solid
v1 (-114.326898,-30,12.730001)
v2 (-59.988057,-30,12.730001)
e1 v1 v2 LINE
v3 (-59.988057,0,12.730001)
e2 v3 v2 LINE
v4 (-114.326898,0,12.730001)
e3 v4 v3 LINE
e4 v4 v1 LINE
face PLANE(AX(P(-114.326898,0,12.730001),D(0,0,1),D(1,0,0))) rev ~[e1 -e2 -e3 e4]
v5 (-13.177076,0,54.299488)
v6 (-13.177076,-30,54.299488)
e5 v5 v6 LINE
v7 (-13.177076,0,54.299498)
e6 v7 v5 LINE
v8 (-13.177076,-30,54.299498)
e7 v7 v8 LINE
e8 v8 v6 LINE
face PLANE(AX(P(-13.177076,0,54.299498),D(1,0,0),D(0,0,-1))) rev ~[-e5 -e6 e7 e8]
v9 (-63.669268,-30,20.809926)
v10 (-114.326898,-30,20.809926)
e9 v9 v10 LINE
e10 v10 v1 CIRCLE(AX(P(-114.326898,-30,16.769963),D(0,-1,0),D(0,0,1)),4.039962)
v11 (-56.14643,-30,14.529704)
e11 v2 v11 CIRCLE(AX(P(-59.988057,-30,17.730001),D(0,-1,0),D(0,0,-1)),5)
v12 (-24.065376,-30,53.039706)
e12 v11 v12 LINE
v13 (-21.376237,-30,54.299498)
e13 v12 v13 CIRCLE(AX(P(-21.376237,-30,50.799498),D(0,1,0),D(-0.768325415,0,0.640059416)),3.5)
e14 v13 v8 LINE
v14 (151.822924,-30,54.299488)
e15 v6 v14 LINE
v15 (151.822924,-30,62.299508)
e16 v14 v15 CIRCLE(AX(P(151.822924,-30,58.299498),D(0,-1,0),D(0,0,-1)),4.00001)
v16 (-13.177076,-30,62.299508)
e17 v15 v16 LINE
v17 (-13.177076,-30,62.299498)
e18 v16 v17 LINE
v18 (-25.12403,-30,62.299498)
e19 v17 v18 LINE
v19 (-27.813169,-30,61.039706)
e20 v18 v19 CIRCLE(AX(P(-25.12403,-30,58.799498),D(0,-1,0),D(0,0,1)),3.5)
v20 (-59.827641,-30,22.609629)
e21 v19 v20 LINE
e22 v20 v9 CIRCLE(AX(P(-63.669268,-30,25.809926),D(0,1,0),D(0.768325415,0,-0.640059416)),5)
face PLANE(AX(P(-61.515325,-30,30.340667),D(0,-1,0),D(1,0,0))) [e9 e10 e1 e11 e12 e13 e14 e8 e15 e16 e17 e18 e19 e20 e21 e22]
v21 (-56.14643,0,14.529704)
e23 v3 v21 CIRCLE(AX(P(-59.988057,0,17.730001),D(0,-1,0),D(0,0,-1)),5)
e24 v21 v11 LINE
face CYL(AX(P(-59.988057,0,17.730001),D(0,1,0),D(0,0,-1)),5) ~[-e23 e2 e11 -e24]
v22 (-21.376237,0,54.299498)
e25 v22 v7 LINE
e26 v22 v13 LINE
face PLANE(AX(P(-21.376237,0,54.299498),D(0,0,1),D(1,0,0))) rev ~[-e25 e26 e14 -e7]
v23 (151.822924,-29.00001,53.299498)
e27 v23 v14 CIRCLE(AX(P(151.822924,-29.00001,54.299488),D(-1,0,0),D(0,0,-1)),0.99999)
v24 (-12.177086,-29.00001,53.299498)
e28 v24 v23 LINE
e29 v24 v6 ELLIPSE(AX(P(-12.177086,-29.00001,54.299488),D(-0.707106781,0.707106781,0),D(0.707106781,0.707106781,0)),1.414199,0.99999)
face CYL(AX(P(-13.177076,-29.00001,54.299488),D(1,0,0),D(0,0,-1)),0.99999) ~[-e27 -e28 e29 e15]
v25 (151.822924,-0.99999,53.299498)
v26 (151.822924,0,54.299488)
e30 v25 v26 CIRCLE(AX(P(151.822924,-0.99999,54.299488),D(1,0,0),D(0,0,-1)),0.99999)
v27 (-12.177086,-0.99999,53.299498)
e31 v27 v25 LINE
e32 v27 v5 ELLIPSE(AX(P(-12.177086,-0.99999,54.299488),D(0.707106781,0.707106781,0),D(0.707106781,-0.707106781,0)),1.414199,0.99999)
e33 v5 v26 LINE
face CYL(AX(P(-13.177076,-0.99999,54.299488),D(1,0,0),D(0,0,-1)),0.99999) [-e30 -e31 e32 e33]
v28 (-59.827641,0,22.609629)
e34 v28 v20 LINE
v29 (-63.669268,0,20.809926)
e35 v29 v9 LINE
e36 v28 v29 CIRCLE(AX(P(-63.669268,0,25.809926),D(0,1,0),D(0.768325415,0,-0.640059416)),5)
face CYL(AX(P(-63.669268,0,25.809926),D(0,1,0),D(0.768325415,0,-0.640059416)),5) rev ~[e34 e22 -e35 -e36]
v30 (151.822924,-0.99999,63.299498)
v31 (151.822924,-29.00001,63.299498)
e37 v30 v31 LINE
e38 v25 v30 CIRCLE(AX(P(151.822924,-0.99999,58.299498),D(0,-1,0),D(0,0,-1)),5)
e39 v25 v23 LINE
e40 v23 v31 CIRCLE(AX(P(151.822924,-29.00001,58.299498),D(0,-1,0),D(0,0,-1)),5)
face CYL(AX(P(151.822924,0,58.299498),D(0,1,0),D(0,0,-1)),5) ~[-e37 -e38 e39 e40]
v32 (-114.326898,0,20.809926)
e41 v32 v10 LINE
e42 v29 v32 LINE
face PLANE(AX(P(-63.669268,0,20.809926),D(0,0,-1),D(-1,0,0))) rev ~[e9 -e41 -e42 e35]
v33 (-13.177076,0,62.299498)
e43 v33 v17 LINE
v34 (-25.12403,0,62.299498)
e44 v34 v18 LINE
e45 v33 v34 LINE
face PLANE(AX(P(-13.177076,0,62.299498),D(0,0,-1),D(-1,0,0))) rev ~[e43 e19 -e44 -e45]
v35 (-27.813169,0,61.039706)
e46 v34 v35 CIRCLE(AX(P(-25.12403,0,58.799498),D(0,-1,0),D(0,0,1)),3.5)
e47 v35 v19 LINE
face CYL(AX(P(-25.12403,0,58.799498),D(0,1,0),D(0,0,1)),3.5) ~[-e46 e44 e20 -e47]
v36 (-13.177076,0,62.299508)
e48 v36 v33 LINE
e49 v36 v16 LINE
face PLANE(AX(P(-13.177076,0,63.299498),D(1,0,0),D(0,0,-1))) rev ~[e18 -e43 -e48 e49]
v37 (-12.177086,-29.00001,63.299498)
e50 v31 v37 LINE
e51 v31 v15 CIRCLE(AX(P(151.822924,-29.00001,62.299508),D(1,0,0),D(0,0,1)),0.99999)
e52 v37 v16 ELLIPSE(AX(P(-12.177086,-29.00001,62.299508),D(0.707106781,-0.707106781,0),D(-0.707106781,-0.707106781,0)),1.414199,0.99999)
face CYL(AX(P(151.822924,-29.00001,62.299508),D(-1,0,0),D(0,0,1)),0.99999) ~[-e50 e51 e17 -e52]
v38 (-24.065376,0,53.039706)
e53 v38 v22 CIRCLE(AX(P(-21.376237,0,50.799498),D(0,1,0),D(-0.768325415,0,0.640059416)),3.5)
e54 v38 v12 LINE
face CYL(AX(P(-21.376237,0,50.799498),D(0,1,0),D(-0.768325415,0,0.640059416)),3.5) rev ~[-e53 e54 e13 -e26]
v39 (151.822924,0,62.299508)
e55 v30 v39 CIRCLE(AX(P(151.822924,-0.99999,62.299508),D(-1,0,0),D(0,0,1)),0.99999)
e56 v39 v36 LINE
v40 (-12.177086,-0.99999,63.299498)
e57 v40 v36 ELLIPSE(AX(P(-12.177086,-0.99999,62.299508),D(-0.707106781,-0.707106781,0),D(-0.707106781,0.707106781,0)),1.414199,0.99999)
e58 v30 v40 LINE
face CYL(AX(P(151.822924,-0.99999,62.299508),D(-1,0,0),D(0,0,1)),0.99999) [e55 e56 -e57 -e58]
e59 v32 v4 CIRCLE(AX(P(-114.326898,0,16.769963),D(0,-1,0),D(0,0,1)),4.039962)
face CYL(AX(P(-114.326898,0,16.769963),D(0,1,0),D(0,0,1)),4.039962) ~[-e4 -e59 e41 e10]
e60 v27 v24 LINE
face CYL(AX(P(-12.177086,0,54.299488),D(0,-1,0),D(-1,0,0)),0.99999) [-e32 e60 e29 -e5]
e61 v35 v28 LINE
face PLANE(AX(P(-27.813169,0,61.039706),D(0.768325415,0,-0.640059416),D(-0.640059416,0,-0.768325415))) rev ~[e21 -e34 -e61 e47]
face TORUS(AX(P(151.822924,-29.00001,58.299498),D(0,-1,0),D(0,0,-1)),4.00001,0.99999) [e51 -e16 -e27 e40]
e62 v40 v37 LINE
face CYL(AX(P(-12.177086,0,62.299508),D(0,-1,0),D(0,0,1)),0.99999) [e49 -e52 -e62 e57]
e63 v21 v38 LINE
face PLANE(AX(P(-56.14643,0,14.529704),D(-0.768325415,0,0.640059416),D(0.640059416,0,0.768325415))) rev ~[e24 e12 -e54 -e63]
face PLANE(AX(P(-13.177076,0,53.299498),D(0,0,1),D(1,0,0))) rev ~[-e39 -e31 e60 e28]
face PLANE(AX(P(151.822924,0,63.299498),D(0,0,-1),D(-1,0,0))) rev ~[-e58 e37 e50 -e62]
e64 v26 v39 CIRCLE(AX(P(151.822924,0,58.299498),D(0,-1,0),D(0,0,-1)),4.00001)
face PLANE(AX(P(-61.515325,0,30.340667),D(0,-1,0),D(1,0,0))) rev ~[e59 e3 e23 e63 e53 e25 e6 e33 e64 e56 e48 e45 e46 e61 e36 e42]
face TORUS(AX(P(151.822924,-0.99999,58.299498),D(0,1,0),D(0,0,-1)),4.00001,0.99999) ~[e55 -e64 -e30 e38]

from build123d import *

# Parameters (mm, degrees)
F1_DEPTH = 30
F2_R     = 0.99999


# Not quite as in the source:
# - a fillet or chamfer is up to 0.001 mm smaller than in the source, because OpenCascade refuses the exact size


with BuildPart() as f1:
    # F0 (on Front) → F1 (new body)
    with BuildSketch(Plane.XZ):
        with BuildLine():
            Line((-63.6692684564, 20.8099257126), (-114.3268977837, 20.8099257126))
            ThreePointArc((-114.3268977837, 20.8099257126), (-118.3668602392, 16.7699632572), (-114.3268977837, 12.7300008017))
            Line((-114.3268977837, 12.7300008017), (-59.988057444, 12.7300008017))
            ThreePointArc((-59.988057444, 12.7300008017), (-57.8669121635, 13.2022262159), (-56.1464303666, 14.5297037219))
            Line((-56.1464303666, 14.5297037219), (-24.0653757294, 53.0397061037))
            ThreePointArc((-24.0653757294, 53.0397061037), (-22.8610384715, 53.9689403579), (-21.3762367753, 54.2994981479))
            Line((-21.3762367753, 54.2994981479), (-13.1770761366, 54.2994981479))
            Line((-13.1770761366, 54.2994981479), (-13.1770761366, 62.2994981479))
            Line((-13.1770761366, 62.2994981479), (-25.1240298515, 62.2994981479))
            ThreePointArc((-25.1240298515, 62.2994981479), (-26.6088315478, 61.9689403579), (-27.8131688056, 61.0397061037))
            Line((-27.8131688056, 61.0397061037), (-59.8276413791, 22.6096286329))
            ThreePointArc((-59.8276413791, 22.6096286329), (-61.548123176, 21.2821511269), (-63.6692684564, 20.8099257126))
        make_face()
        with BuildLine():
            Line((-13.1770761366, 63.2994981479), (-13.1770761366, 62.2994981479))
            Line((-13.1770761366, 62.2994981479), (-13.1770761366, 54.2994981479))
            Line((-13.1770761366, 54.2994981479), (-13.1770761366, 53.2994981479))
            Line((-13.1770761366, 53.2994981479), (151.8229238634, 53.2994981479))
            ThreePointArc((151.8229238634, 53.2994981479), (156.8229238634, 58.2994981479), (151.8229238634, 63.2994981479))
            Line((151.8229238634, 63.2994981479), (-13.1770761366, 63.2994981479))
        make_face()
    extrude(amount=F1_DEPTH)

    # F2 (radius 1 in the source; OpenCascade refuses exactly that, so slightly less here)
    f2_edges = [f1.edges().sort_by_distance(p)[0] for p in [
        (69.322924, 0, 63.299498),
        (69.322924, -30, 53.299498),
        (151.822924, -15, 63.299498),
        (151.822924, -15, 53.299498),
        (-13.177076, -15, 53.299498),
        (-13.177076, -15, 63.299498),
    ]]
    fillet(f2_edges, radius=F2_R)


solid = f1.part
